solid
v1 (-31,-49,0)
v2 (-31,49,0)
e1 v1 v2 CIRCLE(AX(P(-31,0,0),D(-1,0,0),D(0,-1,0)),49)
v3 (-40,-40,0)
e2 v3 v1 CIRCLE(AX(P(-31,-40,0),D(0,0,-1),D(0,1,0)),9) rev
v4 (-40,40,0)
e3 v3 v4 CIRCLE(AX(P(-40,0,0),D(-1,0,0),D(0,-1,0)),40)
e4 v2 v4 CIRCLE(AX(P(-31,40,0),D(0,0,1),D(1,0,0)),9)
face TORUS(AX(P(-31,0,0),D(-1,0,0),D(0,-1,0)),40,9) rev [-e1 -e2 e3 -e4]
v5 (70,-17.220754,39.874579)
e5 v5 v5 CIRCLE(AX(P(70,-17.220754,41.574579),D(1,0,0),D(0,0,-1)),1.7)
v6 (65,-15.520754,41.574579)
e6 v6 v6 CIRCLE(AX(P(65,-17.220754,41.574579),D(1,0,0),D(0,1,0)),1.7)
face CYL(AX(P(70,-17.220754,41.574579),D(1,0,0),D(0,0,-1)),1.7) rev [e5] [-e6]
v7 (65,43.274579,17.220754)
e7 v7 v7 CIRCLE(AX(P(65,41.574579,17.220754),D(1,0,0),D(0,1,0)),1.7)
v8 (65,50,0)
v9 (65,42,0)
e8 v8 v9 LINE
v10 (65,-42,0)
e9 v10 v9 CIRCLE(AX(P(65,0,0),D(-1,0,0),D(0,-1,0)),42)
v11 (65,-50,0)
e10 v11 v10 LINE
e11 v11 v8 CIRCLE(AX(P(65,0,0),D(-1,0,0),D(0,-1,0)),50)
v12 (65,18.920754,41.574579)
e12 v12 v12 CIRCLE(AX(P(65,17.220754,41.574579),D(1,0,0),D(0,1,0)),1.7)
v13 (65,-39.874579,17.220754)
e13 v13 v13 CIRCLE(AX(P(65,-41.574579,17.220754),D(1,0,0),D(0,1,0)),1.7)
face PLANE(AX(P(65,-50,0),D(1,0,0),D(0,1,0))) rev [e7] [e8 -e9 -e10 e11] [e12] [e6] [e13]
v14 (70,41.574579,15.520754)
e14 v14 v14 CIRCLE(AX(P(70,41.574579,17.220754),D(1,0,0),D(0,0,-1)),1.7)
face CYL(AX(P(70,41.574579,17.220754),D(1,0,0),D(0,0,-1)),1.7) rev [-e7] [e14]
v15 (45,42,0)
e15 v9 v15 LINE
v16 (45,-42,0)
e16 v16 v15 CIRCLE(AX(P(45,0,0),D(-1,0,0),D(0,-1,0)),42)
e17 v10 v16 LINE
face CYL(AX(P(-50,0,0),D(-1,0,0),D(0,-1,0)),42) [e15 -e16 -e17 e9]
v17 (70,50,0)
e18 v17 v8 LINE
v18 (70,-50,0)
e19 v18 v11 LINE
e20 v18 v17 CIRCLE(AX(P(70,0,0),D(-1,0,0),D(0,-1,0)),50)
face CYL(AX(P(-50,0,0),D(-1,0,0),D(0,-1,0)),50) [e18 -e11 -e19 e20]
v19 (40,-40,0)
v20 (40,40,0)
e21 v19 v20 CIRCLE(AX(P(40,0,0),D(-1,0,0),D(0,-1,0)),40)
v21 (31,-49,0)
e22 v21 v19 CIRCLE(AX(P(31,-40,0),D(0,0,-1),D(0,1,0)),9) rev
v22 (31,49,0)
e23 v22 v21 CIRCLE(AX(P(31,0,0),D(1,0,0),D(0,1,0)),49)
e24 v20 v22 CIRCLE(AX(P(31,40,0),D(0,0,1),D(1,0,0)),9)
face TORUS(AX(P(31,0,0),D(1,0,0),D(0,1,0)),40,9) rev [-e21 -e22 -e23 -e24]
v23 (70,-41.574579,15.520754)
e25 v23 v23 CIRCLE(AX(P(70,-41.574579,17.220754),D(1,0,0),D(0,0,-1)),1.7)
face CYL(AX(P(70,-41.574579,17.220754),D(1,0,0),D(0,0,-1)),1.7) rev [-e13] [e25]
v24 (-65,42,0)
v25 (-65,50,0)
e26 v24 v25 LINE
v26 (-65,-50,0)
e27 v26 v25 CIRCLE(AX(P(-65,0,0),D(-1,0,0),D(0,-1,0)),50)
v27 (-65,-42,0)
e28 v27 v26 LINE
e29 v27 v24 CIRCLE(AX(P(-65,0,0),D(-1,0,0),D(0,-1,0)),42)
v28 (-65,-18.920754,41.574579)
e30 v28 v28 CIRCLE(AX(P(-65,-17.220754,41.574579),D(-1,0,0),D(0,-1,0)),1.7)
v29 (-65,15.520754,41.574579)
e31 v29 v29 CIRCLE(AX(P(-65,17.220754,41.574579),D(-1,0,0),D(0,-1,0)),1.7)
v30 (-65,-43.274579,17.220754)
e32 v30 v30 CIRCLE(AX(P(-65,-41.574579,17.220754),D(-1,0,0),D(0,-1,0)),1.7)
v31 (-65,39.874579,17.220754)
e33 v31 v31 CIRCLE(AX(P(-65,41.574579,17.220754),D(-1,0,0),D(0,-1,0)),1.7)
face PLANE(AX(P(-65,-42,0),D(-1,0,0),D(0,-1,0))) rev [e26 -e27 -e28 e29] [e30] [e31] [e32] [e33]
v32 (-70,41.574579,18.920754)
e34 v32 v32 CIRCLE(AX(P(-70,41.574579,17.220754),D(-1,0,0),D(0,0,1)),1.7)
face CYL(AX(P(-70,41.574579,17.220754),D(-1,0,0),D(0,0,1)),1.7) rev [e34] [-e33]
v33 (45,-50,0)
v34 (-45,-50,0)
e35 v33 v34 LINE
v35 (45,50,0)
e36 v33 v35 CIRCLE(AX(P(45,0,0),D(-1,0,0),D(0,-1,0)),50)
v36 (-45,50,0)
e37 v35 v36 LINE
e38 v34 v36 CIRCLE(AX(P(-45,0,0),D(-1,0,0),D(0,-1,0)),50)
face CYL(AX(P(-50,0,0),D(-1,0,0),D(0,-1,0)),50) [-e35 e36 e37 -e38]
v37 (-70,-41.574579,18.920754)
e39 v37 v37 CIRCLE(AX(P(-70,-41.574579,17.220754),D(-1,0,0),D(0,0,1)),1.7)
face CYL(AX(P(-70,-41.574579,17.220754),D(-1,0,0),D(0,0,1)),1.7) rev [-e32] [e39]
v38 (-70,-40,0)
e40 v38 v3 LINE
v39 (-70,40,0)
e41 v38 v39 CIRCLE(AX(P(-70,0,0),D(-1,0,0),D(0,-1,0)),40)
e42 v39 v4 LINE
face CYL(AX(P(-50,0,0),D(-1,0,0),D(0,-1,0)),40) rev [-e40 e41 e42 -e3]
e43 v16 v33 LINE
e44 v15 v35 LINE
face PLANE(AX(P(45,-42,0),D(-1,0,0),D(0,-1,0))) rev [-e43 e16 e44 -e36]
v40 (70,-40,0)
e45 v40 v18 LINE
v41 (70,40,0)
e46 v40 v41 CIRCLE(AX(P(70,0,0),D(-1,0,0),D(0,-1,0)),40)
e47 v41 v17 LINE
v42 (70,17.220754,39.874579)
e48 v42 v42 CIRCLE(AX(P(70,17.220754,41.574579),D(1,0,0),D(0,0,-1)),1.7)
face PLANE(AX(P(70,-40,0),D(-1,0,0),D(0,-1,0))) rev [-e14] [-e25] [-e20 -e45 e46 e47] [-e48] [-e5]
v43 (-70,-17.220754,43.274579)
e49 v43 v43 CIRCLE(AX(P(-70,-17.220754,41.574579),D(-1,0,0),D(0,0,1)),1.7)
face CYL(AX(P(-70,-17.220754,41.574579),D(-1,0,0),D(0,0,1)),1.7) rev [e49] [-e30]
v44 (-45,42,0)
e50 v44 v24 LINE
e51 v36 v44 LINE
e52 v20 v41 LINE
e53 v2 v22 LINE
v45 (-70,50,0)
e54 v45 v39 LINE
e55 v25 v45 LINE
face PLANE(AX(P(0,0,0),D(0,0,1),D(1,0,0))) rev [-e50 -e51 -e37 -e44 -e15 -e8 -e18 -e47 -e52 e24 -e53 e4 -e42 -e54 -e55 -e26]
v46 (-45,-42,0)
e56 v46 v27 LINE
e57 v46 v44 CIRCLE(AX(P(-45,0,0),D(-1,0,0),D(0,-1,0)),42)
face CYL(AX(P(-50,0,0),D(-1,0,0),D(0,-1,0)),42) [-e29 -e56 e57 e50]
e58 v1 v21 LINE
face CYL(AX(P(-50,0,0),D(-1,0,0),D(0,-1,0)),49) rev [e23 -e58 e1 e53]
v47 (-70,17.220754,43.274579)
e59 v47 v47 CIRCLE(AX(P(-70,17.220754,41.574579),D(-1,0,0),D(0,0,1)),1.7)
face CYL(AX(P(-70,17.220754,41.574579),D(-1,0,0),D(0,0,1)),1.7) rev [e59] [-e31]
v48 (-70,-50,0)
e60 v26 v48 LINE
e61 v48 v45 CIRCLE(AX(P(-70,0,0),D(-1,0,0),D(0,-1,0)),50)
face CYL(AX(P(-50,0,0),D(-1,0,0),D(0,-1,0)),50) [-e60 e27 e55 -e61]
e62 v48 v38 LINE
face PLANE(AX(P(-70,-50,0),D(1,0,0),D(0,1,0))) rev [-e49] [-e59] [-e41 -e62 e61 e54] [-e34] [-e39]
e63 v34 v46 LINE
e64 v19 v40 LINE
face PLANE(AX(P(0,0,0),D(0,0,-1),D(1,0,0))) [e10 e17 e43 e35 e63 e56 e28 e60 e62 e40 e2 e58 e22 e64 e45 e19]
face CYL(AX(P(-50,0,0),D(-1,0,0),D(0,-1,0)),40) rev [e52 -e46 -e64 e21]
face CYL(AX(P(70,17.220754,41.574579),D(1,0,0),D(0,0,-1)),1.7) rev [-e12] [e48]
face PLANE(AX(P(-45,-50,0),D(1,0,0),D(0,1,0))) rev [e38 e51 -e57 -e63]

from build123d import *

# Parameters (mm, degrees)
REVOLVE_1_ANGLE          = 180
HOLE_WIZARD_M3_1_D       = 3.4
HOLE_WIZARD_M3_1_DEPTH   = 5
PATTERN_CIRCULAR_1_COUNT = 4
PATTERN_CIRCULAR_1_ANGLE = 135
MIRROR_1_COPY_1_D        = 3.4
MIRROR_1_COPY_1_DEPTH    = 5
MIRROR_1_COPY_2_D        = 3.4
MIRROR_1_COPY_2_DEPTH    = 5
MIRROR_1_COPY_3_D        = 3.4
MIRROR_1_COPY_3_DEPTH    = 5
FILLET_1_R               = 9


with BuildPart() as part:
    # ｽｹｯﾁ1 → 回転1 (revolve)
    with BuildSketch(Plane.XY):
        Polygon((-70, 40), (-40, 40), (-40, 49), (40, 49), (40, 40), (70, 40), (70, 50), (65, 50), (65, 42), (45, 42), (45, 50), (-45, 50), (-45, 42), (-65, 42), (-65, 50), (-70, 50), align=None)
    revolve(axis=Axis((-50, 0, 0), (1, 0, 0)), revolution_arc=REVOLVE_1_ANGLE)

    # M3 すきま穴1
    with Locations(Plane.ZY.offset(70)):
        with Locations((17.220754456, -41.574578963)):
            hole_wizard_m3_1 = Hole(HOLE_WIZARD_M3_1_D / 2, depth=HOLE_WIZARD_M3_1_DEPTH)

    # 円形ﾊﾟﾀｰﾝ1: M3 すきま穴1 ×4 about axis
    pattern_circular_1_axis = Axis((0, 0, 0), (-1, 0, 0))
    for i in range(1, PATTERN_CIRCULAR_1_COUNT):
        add(hole_wizard_m3_1.rotate(pattern_circular_1_axis, i * PATTERN_CIRCULAR_1_ANGLE / (PATTERN_CIRCULAR_1_COUNT - 1)), mode=Mode.SUBTRACT)

    # ﾐﾗｰ1: M3 すきま穴1 across plane
    add(hole_wizard_m3_1.mirror(Plane(origin=(0, 0, 0), x_dir=(0, 0, 1), z_dir=(1, 0, 0))), mode=Mode.SUBTRACT)

    # ﾐﾗｰ1 copy 1
    with Locations(Plane(origin=(70, 0, 0), x_dir=(0, 0.7071067811865487, 0.7071067811865464), z_dir=(1, 0, 0))):
        with Locations((17.220754456, 41.574578963)):
            Hole(MIRROR_1_COPY_1_D / 2, depth=MIRROR_1_COPY_1_DEPTH)

    # ﾐﾗｰ1 copy 2
    with Locations(Plane.YZ.offset(70)):
        with Locations((17.220754456, 41.574578963)):
            Hole(MIRROR_1_COPY_2_D / 2, depth=MIRROR_1_COPY_2_DEPTH)

    # ﾐﾗｰ1 copy 3
    with Locations(Plane(origin=(70, 0, 0), x_dir=(0, 0.7071067811865441, -0.7071067811865509), z_dir=(1, 0, 0))):
        with Locations((17.220754456, 41.574578963)):
            Hole(MIRROR_1_COPY_3_D / 2, depth=MIRROR_1_COPY_3_DEPTH)

    # ﾌｨﾚｯﾄ1
    fillet_1_edges = [part.edges().sort_by_distance(p)[0] for p in [
        (-40, 0, 49),
        (40, 0, 49),
    ]]
    fillet(fillet_1_edges, radius=FILLET_1_R - 0.0001)  # a hair under: the kernel refuses the full size


solid = part.part
